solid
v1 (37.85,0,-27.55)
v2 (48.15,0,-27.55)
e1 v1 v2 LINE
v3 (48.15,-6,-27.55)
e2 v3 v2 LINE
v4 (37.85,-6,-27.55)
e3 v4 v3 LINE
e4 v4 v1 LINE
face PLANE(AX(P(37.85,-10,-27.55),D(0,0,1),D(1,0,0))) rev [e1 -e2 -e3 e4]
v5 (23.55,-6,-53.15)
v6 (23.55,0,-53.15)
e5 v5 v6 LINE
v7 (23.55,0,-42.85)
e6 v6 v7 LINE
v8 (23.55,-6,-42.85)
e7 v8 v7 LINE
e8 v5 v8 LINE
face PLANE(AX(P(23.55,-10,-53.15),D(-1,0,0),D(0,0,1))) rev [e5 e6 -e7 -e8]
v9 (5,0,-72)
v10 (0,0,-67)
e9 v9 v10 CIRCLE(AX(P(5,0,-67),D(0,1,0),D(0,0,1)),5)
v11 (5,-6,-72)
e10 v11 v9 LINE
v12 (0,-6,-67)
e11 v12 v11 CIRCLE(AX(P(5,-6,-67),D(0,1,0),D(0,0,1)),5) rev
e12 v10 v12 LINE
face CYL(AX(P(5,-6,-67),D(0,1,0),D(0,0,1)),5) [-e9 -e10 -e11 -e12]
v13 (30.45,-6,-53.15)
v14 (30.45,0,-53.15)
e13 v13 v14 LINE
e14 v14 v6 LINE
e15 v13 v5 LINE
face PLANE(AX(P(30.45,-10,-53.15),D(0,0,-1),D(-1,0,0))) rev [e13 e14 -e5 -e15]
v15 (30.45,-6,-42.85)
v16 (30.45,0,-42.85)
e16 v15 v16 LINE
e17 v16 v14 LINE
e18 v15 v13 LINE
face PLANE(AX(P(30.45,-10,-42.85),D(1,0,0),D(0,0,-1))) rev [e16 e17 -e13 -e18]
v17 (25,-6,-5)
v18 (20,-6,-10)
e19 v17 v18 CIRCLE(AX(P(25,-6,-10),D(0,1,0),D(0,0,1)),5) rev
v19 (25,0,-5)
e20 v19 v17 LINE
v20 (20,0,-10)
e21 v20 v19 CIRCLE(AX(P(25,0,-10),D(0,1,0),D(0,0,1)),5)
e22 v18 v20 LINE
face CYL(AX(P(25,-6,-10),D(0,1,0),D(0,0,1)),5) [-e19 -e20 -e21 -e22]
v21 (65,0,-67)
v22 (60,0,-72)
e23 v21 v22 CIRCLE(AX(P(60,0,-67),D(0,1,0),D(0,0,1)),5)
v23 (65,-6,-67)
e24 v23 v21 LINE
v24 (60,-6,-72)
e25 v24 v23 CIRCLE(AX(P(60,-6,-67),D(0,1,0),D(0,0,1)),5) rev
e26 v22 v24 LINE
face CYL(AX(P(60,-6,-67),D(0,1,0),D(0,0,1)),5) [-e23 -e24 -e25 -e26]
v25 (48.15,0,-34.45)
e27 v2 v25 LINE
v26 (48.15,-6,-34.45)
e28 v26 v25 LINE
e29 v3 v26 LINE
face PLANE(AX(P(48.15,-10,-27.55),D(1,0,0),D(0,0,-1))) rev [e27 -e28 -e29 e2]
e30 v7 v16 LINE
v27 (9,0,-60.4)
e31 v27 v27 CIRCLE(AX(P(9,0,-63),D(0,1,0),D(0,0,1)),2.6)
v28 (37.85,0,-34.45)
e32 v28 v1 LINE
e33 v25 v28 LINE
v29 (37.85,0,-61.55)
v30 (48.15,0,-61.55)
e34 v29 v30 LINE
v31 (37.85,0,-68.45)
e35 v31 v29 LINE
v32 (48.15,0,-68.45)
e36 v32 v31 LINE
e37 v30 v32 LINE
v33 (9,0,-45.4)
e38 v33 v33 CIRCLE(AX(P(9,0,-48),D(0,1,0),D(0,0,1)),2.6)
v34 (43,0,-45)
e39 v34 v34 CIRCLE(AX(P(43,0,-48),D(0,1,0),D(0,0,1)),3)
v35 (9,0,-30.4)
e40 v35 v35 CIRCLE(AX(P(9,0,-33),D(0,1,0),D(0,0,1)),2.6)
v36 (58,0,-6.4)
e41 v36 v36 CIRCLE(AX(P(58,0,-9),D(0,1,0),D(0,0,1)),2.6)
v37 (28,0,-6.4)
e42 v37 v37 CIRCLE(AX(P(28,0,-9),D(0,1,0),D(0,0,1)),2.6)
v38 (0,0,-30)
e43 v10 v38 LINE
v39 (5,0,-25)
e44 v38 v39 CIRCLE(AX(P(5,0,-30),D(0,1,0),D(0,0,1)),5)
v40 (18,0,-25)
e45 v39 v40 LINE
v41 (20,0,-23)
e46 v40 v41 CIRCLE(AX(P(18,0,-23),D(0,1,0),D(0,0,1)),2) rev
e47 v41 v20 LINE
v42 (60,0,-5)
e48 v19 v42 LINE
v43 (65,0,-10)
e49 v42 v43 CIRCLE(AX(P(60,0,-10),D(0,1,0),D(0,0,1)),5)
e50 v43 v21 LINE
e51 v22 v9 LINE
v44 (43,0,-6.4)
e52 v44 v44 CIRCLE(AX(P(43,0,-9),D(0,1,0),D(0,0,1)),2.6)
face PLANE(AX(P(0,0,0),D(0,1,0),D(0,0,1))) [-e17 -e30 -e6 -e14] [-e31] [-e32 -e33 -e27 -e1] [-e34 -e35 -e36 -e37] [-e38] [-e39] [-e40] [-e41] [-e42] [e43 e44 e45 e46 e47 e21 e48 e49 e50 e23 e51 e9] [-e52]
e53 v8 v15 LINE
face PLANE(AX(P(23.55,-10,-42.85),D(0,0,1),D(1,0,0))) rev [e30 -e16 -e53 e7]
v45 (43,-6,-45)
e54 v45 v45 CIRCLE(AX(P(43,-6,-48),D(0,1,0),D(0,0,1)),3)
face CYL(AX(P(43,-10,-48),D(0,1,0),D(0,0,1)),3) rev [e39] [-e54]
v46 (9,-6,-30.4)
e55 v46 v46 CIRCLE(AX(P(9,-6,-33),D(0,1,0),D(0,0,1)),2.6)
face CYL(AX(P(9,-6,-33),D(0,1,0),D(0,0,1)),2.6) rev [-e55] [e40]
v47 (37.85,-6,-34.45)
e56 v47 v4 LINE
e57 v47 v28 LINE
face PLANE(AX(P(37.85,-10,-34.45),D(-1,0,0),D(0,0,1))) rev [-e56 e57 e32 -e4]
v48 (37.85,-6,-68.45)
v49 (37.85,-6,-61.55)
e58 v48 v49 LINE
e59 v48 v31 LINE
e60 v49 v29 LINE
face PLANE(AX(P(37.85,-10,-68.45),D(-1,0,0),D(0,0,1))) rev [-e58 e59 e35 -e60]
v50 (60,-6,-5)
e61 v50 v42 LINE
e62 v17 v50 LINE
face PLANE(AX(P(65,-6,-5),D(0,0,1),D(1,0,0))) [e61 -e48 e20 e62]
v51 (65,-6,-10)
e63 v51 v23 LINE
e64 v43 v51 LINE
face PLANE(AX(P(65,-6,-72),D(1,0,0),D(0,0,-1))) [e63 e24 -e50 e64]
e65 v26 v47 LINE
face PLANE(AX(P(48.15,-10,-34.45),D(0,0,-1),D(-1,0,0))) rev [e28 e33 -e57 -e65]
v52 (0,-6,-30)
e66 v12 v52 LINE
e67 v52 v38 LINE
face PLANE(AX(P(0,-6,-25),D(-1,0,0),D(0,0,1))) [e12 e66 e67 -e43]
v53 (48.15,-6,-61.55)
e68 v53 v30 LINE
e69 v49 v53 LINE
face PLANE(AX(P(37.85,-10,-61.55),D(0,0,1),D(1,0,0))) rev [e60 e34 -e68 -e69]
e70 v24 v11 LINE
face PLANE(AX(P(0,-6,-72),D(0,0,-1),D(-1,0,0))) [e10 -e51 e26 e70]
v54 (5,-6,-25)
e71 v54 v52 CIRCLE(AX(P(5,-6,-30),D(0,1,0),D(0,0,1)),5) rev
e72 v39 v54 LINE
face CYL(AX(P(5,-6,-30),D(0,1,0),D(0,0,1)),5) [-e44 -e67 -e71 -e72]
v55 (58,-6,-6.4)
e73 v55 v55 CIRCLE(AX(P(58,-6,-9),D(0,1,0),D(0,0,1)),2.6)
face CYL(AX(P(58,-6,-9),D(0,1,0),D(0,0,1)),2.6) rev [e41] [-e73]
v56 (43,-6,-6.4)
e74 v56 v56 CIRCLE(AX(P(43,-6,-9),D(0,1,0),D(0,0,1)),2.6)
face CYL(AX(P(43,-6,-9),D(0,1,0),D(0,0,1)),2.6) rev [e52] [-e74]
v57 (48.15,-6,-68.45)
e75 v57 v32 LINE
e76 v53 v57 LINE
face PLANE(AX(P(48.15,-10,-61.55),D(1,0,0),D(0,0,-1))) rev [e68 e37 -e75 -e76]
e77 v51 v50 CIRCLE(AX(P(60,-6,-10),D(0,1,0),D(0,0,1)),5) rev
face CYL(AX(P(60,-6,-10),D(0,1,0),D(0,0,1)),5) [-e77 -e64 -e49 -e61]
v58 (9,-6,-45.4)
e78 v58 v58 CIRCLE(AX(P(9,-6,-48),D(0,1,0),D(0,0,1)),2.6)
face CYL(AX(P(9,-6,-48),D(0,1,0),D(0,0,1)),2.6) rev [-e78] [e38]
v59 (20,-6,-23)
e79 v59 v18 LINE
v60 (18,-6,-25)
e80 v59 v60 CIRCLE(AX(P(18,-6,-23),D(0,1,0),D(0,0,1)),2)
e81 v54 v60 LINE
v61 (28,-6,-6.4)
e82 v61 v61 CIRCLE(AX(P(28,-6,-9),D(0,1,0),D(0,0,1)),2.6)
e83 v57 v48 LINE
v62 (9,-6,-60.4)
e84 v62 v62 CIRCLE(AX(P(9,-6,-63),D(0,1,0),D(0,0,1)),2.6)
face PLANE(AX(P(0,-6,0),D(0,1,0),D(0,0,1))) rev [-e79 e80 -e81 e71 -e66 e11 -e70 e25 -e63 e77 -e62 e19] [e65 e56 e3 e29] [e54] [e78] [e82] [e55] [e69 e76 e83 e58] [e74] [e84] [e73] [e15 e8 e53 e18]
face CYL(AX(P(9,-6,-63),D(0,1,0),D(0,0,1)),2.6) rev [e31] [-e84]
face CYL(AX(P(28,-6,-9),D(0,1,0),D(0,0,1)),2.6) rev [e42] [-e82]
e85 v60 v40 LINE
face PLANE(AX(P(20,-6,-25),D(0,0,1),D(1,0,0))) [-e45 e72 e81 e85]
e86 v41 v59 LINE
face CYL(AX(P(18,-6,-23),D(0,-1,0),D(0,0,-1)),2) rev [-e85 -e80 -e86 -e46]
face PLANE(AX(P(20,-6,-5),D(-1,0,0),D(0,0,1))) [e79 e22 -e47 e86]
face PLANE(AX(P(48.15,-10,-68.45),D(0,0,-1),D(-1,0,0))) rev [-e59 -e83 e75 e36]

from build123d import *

# Parameters (mm, degrees)
SKETCH2_R          = 2.6
BASE_FLANGE1_DEPTH = 6
FILLET1_R          = 5
FILLET2_R          = 2
SKETCH6_R          = 3
SKETCH6_W          = 6.9
SKETCH6_H          = 10.3
SKETCH6_W_2        = 10.3
SKETCH6_H_2        = 6.9
CUT_EXTRUDE3_DEPTH = 10


# Sheet-metal steps are written as plain solids
with BuildPart() as part:
    # Sketch2 → Base-Flange1 (new body)
    with BuildSketch(Plane(origin=(0, 0, 0), x_dir=(1, 0, 0), z_dir=(0, 1, 0))):
        Polygon((0, 72), (65, 72), (65, 5), (20, 5), (20, 25), (0, 25), align=None)
        with Locations(Location((28, 9, 0), (0, 0, 270))):
            Circle(SKETCH2_R, mode=Mode.SUBTRACT)
        with Locations(Location((43, 9, 0), (0, 0, 270))):
            Circle(SKETCH2_R, mode=Mode.SUBTRACT)
        with Locations(Location((58, 9, 0), (0, 0, 270))):
            Circle(SKETCH2_R, mode=Mode.SUBTRACT)
        with Locations(Location((9, 33, 0), (0, 0, 270))):
            Circle(SKETCH2_R, mode=Mode.SUBTRACT)
        with Locations(Location((9, 48, 0), (0, 0, 270))):
            Circle(SKETCH2_R, mode=Mode.SUBTRACT)
        with Locations(Location((9, 63, 0), (0, 0, 270))):
            Circle(SKETCH2_R, mode=Mode.SUBTRACT)
    extrude(amount=-BASE_FLANGE1_DEPTH)

    # Fillet1
    fillet1_edges = [part.edges().sort_by_distance(p)[0] for p in [
        (0, -3, -25),
        (0, -3, -72),
        (65, -3, -72),
        (65, -3, -5),
        (20, -3, -5),
    ]]
    fillet(fillet1_edges, radius=FILLET1_R)

    # Fillet2
    fillet2_edges = [part.edges().sort_by_distance(p)[0] for p in [
        (20, -3, -25),
    ]]
    fillet(fillet2_edges, radius=FILLET2_R)

    # Sketch6 → Cut-Extrude3 (cut)
    with BuildSketch(Plane(origin=(0, 0, 0), x_dir=(1, 0, 0), z_dir=(0, 1, 0))):
        with Locations(Location((43, 48, 0), (0, 0, 270))):
            Circle(SKETCH6_R)
        with Locations((27, 48)):
            Rectangle(SKETCH6_W, SKETCH6_H)
        with Locations((43, 31)):
            Rectangle(SKETCH6_W_2, SKETCH6_H_2)
        with Locations((43, 65)):
            Rectangle(SKETCH6_W_2, SKETCH6_H_2)
    extrude(amount=-CUT_EXTRUDE3_DEPTH, mode=Mode.SUBTRACT)


solid = part.part
